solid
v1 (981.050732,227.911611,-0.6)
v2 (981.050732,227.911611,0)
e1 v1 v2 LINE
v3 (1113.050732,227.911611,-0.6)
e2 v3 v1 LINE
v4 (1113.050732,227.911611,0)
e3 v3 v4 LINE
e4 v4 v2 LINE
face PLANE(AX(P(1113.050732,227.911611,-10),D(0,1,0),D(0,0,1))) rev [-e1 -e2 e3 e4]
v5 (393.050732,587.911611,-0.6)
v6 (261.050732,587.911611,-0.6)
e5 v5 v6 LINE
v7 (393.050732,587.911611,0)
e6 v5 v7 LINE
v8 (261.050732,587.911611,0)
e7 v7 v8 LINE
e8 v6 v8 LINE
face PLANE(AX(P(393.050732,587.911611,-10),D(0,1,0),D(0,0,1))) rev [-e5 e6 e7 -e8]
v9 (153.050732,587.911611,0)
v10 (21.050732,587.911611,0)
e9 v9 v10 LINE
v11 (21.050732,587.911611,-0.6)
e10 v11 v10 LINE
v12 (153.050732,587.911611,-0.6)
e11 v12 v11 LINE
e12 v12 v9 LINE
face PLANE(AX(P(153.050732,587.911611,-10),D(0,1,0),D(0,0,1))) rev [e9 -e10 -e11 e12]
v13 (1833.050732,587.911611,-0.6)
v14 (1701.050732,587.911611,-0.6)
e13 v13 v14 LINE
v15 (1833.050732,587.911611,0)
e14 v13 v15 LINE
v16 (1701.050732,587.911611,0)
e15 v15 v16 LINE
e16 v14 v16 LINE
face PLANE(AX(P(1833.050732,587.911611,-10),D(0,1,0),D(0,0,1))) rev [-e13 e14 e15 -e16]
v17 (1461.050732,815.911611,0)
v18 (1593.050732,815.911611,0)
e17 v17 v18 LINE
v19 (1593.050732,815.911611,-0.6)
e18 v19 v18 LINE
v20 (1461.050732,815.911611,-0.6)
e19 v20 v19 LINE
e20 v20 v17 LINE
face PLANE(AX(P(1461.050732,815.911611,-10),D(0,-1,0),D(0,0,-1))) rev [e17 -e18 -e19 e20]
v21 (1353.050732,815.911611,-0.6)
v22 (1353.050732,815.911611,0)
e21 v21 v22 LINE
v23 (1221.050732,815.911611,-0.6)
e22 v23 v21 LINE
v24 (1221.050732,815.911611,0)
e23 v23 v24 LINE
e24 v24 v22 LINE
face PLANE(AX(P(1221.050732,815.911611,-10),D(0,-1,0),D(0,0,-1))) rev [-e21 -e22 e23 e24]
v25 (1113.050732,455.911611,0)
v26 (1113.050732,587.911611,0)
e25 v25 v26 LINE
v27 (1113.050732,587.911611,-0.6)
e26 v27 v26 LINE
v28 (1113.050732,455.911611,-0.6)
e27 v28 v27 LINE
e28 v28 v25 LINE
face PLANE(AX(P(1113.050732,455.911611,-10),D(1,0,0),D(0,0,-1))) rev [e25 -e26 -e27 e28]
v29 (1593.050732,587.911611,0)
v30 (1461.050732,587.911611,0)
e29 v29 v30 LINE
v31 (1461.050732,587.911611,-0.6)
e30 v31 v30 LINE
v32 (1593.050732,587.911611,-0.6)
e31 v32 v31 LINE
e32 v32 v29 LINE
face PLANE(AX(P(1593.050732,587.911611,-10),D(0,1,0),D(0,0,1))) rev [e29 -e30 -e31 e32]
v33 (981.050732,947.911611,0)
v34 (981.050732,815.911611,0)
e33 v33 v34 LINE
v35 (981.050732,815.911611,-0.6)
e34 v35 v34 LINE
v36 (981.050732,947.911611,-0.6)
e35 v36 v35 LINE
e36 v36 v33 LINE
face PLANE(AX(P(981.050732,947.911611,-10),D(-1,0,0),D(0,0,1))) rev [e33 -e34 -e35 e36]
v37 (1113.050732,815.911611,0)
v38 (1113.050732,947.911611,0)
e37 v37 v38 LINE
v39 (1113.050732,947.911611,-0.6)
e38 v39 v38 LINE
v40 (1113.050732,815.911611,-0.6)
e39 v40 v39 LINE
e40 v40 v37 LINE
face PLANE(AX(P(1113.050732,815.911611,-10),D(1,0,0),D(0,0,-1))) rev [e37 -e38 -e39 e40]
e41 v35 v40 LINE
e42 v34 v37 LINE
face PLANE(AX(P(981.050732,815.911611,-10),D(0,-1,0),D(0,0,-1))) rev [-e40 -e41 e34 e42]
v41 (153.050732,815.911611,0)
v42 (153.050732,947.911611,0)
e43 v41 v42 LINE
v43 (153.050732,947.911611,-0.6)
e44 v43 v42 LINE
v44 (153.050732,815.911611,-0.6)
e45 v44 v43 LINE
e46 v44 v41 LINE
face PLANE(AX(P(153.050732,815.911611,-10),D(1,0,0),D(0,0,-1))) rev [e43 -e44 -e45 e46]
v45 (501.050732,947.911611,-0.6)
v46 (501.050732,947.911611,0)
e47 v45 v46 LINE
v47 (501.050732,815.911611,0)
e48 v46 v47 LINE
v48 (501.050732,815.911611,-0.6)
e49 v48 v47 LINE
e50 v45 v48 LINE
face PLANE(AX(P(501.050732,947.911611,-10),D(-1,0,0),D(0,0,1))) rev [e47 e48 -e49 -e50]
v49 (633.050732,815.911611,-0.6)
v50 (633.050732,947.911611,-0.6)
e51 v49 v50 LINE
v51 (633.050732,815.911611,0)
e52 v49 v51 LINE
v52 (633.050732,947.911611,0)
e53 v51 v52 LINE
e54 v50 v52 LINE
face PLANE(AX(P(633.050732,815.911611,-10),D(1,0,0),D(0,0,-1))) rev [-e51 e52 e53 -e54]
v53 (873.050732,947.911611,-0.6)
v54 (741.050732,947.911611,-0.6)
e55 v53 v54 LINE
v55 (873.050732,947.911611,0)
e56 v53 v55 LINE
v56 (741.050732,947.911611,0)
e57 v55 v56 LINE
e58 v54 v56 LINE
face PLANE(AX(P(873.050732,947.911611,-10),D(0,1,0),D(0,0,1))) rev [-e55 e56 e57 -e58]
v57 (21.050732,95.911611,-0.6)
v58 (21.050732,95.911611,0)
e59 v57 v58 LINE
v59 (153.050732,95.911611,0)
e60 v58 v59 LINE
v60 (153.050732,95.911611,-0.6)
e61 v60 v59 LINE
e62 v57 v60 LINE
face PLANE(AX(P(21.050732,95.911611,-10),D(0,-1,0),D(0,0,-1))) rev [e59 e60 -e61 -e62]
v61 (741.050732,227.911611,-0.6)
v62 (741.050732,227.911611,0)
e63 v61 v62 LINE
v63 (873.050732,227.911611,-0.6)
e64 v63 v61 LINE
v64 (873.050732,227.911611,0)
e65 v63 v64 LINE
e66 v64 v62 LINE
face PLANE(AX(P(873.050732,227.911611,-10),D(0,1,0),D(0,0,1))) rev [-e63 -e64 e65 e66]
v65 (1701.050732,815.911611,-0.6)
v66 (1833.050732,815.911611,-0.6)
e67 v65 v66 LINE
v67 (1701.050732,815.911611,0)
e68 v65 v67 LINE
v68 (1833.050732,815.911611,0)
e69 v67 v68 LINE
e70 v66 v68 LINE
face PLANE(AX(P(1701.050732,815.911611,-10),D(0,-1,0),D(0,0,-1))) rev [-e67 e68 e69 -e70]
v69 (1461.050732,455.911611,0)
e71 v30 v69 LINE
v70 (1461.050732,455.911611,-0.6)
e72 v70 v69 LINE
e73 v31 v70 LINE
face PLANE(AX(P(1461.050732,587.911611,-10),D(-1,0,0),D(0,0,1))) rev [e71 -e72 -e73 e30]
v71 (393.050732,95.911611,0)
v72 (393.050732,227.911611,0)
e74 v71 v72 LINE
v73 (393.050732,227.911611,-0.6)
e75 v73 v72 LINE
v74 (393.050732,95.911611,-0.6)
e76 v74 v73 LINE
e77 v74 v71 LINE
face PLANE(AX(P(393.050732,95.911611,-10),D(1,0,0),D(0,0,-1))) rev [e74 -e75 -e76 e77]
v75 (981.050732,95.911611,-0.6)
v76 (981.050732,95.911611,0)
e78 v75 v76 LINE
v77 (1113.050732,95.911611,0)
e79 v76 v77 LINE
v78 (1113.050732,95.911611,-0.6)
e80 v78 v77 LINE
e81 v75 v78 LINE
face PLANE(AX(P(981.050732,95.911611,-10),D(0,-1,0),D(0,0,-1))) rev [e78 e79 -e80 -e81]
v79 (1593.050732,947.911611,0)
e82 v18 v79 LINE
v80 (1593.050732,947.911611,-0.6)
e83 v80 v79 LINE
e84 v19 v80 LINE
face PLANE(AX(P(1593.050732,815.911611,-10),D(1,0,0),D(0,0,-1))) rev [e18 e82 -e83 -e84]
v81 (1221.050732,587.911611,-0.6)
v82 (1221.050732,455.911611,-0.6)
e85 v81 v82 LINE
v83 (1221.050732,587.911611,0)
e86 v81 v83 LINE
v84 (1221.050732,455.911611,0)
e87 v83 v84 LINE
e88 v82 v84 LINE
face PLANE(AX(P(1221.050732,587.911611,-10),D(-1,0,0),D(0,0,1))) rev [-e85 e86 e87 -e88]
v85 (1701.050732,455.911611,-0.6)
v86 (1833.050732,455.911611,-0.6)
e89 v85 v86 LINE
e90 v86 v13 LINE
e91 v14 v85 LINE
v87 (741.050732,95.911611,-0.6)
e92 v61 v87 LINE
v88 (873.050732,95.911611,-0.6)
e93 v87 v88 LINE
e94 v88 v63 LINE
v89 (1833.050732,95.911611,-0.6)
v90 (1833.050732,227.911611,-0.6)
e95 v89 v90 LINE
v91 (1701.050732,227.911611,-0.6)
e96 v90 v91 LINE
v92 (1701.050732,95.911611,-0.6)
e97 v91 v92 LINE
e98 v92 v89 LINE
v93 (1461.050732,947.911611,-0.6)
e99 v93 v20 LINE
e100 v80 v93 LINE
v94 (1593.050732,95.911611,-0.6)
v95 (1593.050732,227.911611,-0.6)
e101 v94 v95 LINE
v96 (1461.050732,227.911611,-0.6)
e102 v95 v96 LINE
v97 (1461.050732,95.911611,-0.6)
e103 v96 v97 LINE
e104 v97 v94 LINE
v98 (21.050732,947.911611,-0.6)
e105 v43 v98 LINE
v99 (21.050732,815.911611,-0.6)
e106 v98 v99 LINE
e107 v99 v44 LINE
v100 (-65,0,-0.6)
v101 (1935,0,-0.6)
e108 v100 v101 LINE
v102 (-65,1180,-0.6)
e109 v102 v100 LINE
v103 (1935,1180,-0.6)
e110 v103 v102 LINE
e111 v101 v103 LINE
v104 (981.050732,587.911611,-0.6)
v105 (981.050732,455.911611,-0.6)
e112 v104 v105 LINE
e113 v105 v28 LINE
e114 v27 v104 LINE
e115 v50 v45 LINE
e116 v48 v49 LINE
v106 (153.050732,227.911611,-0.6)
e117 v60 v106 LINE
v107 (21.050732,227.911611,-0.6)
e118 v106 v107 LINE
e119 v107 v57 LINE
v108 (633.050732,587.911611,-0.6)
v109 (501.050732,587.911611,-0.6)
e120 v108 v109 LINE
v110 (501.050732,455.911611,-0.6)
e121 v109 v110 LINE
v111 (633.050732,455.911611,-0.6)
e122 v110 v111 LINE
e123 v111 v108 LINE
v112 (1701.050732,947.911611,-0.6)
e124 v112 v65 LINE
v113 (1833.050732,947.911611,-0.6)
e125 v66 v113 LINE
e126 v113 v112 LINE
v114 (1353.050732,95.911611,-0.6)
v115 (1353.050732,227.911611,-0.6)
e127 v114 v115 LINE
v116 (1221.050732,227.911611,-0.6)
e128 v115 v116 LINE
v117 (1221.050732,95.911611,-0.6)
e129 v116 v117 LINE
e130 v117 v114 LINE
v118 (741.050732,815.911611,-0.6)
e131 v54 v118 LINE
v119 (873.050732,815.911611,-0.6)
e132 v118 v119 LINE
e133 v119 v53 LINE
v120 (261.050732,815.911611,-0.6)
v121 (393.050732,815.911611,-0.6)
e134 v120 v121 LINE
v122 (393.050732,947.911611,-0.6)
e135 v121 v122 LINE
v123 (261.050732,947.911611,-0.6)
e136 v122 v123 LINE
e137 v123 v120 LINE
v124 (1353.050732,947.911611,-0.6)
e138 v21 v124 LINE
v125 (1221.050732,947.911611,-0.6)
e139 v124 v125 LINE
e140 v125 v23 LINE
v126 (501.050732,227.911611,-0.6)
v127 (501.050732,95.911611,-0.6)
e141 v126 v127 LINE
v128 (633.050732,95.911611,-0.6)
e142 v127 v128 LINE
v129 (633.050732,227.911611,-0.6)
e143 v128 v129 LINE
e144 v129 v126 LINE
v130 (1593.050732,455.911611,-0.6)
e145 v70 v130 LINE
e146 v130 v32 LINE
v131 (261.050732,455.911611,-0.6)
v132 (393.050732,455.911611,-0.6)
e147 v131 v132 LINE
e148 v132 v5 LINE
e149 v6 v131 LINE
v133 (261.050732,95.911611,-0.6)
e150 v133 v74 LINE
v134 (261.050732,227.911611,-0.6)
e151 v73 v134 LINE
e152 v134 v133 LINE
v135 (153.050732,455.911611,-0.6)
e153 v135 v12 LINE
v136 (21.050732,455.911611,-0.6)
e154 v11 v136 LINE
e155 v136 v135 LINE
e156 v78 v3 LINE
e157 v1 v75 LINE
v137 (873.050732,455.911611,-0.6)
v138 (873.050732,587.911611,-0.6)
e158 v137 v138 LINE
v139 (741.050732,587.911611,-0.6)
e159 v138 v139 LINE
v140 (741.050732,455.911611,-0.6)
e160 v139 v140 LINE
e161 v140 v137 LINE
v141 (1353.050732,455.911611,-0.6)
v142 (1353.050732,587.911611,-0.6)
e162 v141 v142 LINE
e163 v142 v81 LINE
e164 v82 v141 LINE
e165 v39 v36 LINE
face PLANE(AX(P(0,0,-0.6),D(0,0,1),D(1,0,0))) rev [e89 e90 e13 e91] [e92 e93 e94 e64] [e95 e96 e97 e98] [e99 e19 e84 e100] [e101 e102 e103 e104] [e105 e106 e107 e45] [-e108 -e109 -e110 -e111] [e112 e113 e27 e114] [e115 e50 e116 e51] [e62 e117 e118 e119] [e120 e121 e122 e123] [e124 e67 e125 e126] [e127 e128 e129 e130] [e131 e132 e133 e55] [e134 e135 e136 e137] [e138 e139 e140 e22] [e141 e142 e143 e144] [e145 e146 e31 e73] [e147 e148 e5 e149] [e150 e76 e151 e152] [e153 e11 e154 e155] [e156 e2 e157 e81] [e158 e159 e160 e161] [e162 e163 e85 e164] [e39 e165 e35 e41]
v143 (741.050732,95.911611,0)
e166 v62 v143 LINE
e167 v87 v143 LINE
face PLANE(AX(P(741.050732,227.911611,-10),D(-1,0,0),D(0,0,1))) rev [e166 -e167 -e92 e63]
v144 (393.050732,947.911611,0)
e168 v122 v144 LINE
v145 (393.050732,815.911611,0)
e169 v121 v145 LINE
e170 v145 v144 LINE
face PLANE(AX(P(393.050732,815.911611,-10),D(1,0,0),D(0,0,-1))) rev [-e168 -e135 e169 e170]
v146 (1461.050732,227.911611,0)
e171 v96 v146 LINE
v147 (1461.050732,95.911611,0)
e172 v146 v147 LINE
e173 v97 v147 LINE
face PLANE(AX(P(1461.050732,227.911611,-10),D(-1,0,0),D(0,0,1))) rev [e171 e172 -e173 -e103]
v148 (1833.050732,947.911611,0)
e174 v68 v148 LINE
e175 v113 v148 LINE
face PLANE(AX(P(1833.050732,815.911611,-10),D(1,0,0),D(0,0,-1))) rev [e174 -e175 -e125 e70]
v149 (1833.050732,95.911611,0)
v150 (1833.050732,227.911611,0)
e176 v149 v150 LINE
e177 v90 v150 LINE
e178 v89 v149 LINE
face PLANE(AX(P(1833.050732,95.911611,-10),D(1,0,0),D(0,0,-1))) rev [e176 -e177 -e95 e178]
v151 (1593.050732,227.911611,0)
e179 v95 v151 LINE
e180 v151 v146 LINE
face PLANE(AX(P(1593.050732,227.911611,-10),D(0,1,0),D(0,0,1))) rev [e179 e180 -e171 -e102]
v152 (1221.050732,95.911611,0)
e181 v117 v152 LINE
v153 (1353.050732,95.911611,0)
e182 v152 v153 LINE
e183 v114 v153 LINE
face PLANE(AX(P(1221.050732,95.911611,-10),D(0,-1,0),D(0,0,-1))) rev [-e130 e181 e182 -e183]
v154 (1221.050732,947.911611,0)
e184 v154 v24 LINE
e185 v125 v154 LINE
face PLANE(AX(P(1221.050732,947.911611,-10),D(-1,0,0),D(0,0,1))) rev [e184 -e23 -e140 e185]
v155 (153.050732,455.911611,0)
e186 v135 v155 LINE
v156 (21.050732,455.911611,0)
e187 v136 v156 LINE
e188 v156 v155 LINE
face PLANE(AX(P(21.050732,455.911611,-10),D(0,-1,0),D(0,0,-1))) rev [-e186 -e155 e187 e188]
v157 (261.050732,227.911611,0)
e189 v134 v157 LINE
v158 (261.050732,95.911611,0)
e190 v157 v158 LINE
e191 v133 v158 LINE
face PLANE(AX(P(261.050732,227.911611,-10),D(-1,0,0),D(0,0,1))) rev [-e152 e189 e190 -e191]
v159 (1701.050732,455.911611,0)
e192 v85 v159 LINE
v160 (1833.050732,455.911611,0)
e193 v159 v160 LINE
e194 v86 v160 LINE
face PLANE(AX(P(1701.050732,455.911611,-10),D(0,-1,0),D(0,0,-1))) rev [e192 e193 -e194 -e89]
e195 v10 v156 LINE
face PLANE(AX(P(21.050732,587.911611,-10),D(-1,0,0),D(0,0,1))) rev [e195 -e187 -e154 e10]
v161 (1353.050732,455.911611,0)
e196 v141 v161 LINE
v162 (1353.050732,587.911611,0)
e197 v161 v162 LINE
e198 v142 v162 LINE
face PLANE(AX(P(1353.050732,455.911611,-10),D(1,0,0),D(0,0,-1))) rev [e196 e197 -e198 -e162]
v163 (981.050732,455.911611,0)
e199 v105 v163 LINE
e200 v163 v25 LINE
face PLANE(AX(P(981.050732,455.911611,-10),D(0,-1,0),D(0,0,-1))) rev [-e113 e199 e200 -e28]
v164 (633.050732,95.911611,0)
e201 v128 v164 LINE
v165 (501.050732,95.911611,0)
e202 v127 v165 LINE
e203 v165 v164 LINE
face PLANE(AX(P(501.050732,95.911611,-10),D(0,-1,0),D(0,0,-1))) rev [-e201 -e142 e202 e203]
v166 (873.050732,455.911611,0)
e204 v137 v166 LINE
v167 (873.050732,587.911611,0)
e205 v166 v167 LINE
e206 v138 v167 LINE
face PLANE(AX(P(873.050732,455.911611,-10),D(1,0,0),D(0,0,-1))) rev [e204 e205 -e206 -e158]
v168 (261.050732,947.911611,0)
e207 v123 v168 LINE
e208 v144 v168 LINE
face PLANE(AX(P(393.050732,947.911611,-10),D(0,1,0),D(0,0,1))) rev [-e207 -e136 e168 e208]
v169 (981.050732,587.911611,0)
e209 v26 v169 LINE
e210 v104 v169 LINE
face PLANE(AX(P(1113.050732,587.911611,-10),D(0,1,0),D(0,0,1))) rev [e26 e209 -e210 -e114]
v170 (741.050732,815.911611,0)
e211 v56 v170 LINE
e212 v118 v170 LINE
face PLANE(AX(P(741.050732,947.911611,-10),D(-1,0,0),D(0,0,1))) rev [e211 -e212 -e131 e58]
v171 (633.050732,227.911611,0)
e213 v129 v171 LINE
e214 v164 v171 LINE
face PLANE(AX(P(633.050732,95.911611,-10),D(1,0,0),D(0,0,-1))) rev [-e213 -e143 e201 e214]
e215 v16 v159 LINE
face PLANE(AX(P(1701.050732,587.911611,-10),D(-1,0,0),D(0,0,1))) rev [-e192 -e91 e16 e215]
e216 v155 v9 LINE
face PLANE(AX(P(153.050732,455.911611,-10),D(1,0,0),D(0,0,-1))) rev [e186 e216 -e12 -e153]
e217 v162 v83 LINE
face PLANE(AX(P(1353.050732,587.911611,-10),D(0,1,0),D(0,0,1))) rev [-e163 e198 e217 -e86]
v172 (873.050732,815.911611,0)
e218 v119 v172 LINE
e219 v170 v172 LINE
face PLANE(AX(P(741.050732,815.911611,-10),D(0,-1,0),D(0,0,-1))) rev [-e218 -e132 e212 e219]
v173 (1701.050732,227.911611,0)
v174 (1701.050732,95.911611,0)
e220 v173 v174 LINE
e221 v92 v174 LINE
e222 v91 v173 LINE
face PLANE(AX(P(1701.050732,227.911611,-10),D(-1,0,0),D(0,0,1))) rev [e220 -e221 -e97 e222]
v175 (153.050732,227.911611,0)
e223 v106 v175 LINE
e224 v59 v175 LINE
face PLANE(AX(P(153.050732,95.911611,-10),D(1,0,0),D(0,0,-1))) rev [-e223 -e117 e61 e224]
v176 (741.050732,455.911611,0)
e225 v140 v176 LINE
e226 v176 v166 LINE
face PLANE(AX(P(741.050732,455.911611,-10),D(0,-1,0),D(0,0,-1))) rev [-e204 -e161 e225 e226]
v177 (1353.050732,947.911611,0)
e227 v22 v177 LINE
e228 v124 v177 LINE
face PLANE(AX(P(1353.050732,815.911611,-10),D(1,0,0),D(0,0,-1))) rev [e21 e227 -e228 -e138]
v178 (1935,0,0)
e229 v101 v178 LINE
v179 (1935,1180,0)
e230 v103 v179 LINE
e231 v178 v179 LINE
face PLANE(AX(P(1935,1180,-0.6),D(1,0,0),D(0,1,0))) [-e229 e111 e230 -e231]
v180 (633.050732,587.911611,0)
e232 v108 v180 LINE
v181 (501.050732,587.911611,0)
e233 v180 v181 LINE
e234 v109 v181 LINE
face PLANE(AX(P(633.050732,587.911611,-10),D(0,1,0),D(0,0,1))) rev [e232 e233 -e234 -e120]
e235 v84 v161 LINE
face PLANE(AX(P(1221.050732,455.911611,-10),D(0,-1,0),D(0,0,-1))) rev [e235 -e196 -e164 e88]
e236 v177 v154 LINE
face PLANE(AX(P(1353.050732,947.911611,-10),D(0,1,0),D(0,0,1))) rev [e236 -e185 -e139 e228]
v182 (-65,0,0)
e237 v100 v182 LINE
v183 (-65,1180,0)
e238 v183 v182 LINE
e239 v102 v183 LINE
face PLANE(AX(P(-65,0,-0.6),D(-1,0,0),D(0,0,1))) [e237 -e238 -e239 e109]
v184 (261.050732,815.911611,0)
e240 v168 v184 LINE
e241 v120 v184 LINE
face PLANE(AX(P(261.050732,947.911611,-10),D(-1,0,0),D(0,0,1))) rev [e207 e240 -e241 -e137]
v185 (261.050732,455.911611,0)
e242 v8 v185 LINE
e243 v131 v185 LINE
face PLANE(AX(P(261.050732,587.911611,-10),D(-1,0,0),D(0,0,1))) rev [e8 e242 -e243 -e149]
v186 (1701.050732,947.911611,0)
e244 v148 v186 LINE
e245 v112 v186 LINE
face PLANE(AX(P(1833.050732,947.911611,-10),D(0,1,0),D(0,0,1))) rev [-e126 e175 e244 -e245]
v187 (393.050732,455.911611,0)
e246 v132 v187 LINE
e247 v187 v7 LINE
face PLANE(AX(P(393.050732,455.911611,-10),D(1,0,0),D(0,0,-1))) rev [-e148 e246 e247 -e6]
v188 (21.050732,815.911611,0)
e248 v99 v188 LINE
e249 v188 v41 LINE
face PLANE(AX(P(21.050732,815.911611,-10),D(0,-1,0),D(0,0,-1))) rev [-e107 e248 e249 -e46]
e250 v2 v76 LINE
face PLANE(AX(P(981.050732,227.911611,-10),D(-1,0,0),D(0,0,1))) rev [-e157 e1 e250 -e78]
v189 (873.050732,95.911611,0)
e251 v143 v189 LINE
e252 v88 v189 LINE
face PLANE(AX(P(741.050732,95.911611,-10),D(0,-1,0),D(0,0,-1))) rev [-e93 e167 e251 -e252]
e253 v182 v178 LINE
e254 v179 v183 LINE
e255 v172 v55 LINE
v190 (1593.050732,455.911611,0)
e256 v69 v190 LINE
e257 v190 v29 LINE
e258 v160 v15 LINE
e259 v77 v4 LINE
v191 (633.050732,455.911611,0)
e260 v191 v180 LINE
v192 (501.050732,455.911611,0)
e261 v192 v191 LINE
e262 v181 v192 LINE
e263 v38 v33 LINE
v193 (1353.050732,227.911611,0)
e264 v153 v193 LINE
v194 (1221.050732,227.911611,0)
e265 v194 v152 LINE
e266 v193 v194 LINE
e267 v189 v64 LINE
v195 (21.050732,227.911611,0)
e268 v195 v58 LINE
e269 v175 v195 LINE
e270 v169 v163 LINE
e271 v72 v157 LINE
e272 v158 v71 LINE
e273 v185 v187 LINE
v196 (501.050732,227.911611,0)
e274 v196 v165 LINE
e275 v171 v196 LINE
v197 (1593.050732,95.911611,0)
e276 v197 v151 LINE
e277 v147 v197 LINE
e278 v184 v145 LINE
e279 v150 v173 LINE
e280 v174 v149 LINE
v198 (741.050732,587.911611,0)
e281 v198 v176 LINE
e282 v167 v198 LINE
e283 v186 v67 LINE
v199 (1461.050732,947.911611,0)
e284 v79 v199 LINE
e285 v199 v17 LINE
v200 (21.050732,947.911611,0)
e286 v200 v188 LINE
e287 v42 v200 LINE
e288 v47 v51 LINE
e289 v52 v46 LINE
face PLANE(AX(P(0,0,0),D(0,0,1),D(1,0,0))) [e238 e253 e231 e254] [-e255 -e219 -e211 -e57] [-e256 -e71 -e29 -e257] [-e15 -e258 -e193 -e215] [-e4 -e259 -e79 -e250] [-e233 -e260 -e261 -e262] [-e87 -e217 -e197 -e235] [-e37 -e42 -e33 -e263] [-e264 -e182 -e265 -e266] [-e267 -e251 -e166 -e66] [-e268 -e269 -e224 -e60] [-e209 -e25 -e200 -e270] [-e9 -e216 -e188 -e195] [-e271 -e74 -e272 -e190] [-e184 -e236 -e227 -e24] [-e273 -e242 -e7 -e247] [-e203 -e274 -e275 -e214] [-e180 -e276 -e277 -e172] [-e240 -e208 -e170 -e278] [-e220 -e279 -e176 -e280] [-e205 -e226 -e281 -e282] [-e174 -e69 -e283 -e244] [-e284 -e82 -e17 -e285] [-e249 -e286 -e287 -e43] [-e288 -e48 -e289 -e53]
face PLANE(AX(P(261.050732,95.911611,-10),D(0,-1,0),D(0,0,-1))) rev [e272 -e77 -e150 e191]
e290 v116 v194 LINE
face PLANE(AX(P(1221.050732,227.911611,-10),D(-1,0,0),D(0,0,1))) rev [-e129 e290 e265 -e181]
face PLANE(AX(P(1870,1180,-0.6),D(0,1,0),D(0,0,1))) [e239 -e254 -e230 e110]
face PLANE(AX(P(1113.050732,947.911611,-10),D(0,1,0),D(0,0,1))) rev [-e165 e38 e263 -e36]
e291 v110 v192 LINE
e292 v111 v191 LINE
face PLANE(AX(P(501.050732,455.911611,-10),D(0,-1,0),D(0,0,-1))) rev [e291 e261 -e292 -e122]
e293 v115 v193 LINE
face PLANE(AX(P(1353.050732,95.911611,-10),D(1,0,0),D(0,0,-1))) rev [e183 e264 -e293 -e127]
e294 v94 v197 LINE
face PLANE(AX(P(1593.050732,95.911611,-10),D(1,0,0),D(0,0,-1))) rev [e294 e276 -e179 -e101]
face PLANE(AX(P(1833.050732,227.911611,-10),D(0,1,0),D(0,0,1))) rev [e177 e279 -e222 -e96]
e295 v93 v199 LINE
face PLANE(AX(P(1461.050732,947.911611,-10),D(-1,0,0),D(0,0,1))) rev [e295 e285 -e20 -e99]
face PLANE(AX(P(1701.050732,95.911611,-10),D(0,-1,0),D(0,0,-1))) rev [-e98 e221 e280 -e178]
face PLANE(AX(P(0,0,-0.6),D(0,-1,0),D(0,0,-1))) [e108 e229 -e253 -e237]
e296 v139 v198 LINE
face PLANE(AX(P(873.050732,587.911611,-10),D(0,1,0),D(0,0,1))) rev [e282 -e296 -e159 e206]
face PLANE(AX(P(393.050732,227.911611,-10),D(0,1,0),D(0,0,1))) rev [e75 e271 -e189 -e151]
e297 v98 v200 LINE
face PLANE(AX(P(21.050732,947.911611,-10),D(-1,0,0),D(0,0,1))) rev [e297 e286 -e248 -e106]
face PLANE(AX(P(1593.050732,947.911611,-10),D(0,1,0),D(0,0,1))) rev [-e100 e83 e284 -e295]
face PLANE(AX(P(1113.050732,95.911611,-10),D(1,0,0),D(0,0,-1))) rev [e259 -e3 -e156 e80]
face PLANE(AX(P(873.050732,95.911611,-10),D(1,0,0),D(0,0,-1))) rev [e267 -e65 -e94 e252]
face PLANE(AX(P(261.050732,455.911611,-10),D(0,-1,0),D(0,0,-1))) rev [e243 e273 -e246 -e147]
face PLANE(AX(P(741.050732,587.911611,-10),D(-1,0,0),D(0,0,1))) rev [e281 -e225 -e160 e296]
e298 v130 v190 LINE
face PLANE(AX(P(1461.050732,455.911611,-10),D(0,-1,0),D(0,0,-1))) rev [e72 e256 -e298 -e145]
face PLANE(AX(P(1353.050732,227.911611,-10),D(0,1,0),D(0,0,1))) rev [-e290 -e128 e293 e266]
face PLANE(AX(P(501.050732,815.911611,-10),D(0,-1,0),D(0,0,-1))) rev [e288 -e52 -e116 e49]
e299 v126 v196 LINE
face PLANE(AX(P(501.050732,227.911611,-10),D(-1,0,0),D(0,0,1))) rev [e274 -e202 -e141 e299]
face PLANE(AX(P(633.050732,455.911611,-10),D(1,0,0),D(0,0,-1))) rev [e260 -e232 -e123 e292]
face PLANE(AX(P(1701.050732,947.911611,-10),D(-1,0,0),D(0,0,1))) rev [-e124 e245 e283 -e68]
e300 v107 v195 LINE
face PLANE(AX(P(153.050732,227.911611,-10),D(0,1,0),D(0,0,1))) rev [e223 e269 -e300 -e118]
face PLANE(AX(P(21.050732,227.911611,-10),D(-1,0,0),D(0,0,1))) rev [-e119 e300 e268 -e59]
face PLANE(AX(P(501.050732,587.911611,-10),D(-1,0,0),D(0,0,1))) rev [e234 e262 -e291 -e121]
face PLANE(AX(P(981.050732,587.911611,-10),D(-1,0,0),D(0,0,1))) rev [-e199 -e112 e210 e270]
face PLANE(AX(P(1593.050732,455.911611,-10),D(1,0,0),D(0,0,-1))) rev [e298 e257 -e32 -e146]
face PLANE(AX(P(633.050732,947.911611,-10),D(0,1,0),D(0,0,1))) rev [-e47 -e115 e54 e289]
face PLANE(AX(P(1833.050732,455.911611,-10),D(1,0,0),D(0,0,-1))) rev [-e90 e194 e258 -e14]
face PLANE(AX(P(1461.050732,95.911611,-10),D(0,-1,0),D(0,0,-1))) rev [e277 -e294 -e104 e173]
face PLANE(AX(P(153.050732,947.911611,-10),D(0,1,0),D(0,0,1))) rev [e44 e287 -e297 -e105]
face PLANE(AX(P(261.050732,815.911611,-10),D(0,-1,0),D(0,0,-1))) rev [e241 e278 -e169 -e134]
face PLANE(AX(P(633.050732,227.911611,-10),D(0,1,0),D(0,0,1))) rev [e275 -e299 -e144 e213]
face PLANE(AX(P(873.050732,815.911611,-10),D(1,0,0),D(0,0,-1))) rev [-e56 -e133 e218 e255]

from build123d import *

# Parameters (mm, degrees)
MODEL_W             = 1870
MODEL_H             = 1180
BASE_FLANGE1_DEPTH  = 0.6
TAB1_DEPTH          = 0.6
SKETCH7_W           = 65
SKETCH7_H           = 1180
TAB2_DEPTH          = 0.6
SKETCH9_W           = 1840.328960488
SKETCH9_H           = 1045.942358838
BOSS_EXTRUDE1_DEPTH = 0.6
SKETCH8_W           = 132
SKETCH8_H           = 132
CUT_EXTRUDE1_DEPTH  = 10


# Sheet-metal steps are written as plain solids
with BuildPart() as part:
    # Model → Base-Flange1 (new body)
    with BuildSketch(Plane.XY):
        with Locations((935, 590)):
            Rectangle(MODEL_W, MODEL_H)
        Polygon((1790, 440), (1640, 440), (1640, 595), (1650, 595), (1650, 662), (1780, 662), (1780, 595), (1790, 595), align=None, mode=Mode.SUBTRACT)
        Polygon((1595, 440), (1445, 440), (1445, 595), (1455, 595), (1455, 662), (1585, 662), (1585, 595), (1595, 595), align=None, mode=Mode.SUBTRACT)
        Polygon((1400, 440), (1250, 440), (1250, 595), (1260, 595), (1260, 662), (1390, 662), (1390, 595), (1400, 595), align=None, mode=Mode.SUBTRACT)
        Polygon((1205, 440), (1055, 440), (1055, 595), (1065, 595), (1065, 662), (1195, 662), (1195, 595), (1205, 595), align=None, mode=Mode.SUBTRACT)
        Polygon((1010, 440), (860, 440), (860, 595), (870, 595), (870, 662), (1000, 662), (1000, 595), (1010, 595), align=None, mode=Mode.SUBTRACT)
        Polygon((815, 440), (665, 440), (665, 595), (675, 595), (675, 662), (805, 662), (805, 595), (815, 595), align=None, mode=Mode.SUBTRACT)
        Polygon((620, 440), (470, 440), (470, 595), (480, 595), (480, 662), (610, 662), (610, 595), (620, 595), align=None, mode=Mode.SUBTRACT)
        Polygon((425, 440), (275, 440), (275, 595), (285, 595), (285, 662), (415, 662), (415, 595), (425, 595), align=None, mode=Mode.SUBTRACT)
        Polygon((230, 440), (80, 440), (80, 595), (90, 595), (90, 662), (220, 662), (220, 595), (230, 595), align=None, mode=Mode.SUBTRACT)
        Polygon((1790, 805), (1640, 805), (1640, 960), (1650, 960), (1650, 1027), (1780, 1027), (1780, 960), (1790, 960), align=None, mode=Mode.SUBTRACT)
        Polygon((1595, 805), (1445, 805), (1445, 960), (1455, 960), (1455, 1027), (1585, 1027), (1585, 960), (1595, 960), align=None, mode=Mode.SUBTRACT)
        Polygon((1400, 805), (1250, 805), (1250, 960), (1260, 960), (1260, 1027), (1390, 1027), (1390, 960), (1400, 960), align=None, mode=Mode.SUBTRACT)
        Polygon((1205, 805), (1055, 805), (1055, 960), (1065, 960), (1065, 1027), (1195, 1027), (1195, 960), (1205, 960), align=None, mode=Mode.SUBTRACT)
        Polygon((1010, 805), (860, 805), (860, 960), (870, 960), (870, 1027), (1000, 1027), (1000, 960), (1010, 960), align=None, mode=Mode.SUBTRACT)
        Polygon((815, 805), (665, 805), (665, 960), (675, 960), (675, 1027), (805, 1027), (805, 960), (815, 960), align=None, mode=Mode.SUBTRACT)
        Polygon((620, 805), (470, 805), (470, 960), (480, 960), (480, 1027), (610, 1027), (610, 960), (620, 960), align=None, mode=Mode.SUBTRACT)
        Polygon((425, 805), (275, 805), (275, 960), (285, 960), (285, 1027), (415, 1027), (415, 960), (425, 960), align=None, mode=Mode.SUBTRACT)
        Polygon((230, 805), (80, 805), (80, 960), (90, 960), (90, 1027), (220, 1027), (220, 960), (230, 960), align=None, mode=Mode.SUBTRACT)
        Polygon((1790, 75), (1640, 75), (1640, 230), (1650, 230), (1650, 297), (1780, 297), (1780, 230), (1790, 230), align=None, mode=Mode.SUBTRACT)
        Polygon((1595, 75), (1445, 75), (1445, 230), (1455, 230), (1455, 297), (1585, 297), (1585, 230), (1595, 230), align=None, mode=Mode.SUBTRACT)
        Polygon((1400, 75), (1250, 75), (1250, 230), (1260, 230), (1260, 297), (1390, 297), (1390, 230), (1400, 230), align=None, mode=Mode.SUBTRACT)
        Polygon((1205, 75), (1055, 75), (1055, 230), (1065, 230), (1065, 297), (1195, 297), (1195, 230), (1205, 230), align=None, mode=Mode.SUBTRACT)
        Polygon((1010, 75), (860, 75), (860, 230), (870, 230), (870, 297), (1000, 297), (1000, 230), (1010, 230), align=None, mode=Mode.SUBTRACT)
        Polygon((815, 75), (665, 75), (665, 230), (675, 230), (675, 297), (805, 297), (805, 230), (815, 230), align=None, mode=Mode.SUBTRACT)
        Polygon((620, 75), (470, 75), (470, 230), (480, 230), (480, 297), (610, 297), (610, 230), (620, 230), align=None, mode=Mode.SUBTRACT)
        Polygon((425, 75), (275, 75), (275, 230), (285, 230), (285, 297), (415, 297), (415, 230), (425, 230), align=None, mode=Mode.SUBTRACT)
        Polygon((230, 75), (80, 75), (80, 230), (90, 230), (90, 297), (220, 297), (220, 230), (230, 230), align=None, mode=Mode.SUBTRACT)
    extrude(amount=-BASE_FLANGE1_DEPTH)

    # Sketch6 → Tab1 (add)
    with BuildSketch(Plane.XY):
        Polygon((1705, 805), (1725, 805), (1725, 806), (1789, 806), (1789, 959), (1779, 959), (1779, 1026), (1725, 1026), (1725, 1027), (1705, 1027), (1705, 1026), (1651, 1026), (1651, 959), (1641, 959), (1641, 806), (1705, 806), align=None)
        Polygon((1705, 440), (1725, 440), (1725, 441), (1789, 441), (1789, 594), (1779, 594), (1779, 661), (1725, 661), (1725, 662), (1705, 662), (1705, 661), (1651, 661), (1651, 594), (1641, 594), (1641, 441), (1705, 441), align=None)
        Polygon((1705, 75), (1725, 75), (1725, 76), (1789, 76), (1789, 229), (1779, 229), (1779, 296), (1725, 296), (1725, 297), (1705, 297), (1705, 296), (1651, 296), (1651, 229), (1641, 229), (1641, 76), (1705, 76), align=None)
    extrude(amount=-TAB1_DEPTH)

    # Sketch7 → Tab2 (add)
    with BuildSketch(Plane.XY):
        with Locations((1902.5, 590)):
            Rectangle(SKETCH7_W, SKETCH7_H)
        with Locations((-32.5, 590)):
            Rectangle(SKETCH7_W, SKETCH7_H)
    extrude(amount=-TAB2_DEPTH)

    # Sketch9 → Boss-Extrude1 (add)
    with BuildSketch(Plane.XY):
        with Locations((950.64470062, 555.573524784)):
            Rectangle(SKETCH9_W, SKETCH9_H)
    extrude(amount=-BOSS_EXTRUDE1_DEPTH)

    # Sketch8 → Cut-Extrude1 (cut)
    with BuildSketch(Plane.XY):
        with Locations((1767.05073242, 881.911611336)):
            Rectangle(SKETCH8_W, SKETCH8_H)
        with Locations((1527.05073242, 881.911611336)):
            Rectangle(SKETCH8_W, SKETCH8_H)
        with Locations((1287.05073242, 881.911611336)):
            Rectangle(SKETCH8_W, SKETCH8_H)
        with Locations((1047.05073242, 881.911611336)):
            Rectangle(SKETCH8_W, SKETCH8_H)
        with Locations((807.05073242, 881.911611336)):
            Rectangle(SKETCH8_W, SKETCH8_H)
        with Locations((567.05073242, 881.911611336)):
            Rectangle(SKETCH8_W, SKETCH8_H)
        with Locations((327.05073242, 881.911611336)):
            Rectangle(SKETCH8_W, SKETCH8_H)
        with Locations((87.05073242, 881.911611336)):
            Rectangle(SKETCH8_W, SKETCH8_H)
        with Locations((1527.05073242, 521.911611336)):
            Rectangle(SKETCH8_W, SKETCH8_H)
        with Locations((1287.05073242, 521.911611336)):
            Rectangle(SKETCH8_W, SKETCH8_H)
        with Locations((1047.05073242, 521.911611336)):
            Rectangle(SKETCH8_W, SKETCH8_H)
        with Locations((807.05073242, 521.911611336)):
            Rectangle(SKETCH8_W, SKETCH8_H)
        with Locations((567.05073242, 521.911611336)):
            Rectangle(SKETCH8_W, SKETCH8_H)
        with Locations((327.05073242, 521.911611336)):
            Rectangle(SKETCH8_W, SKETCH8_H)
        with Locations((87.05073242, 521.911611336)):
            Rectangle(SKETCH8_W, SKETCH8_H)
        with Locations((1527.05073242, 161.911611336)):
            Rectangle(SKETCH8_W, SKETCH8_H)
        with Locations((1287.05073242, 161.911611336)):
            Rectangle(SKETCH8_W, SKETCH8_H)
        with Locations((1047.05073242, 161.911611336)):
            Rectangle(SKETCH8_W, SKETCH8_H)
        with Locations((807.05073242, 161.911611336)):
            Rectangle(SKETCH8_W, SKETCH8_H)
        with Locations((567.05073242, 161.911611336)):
            Rectangle(SKETCH8_W, SKETCH8_H)
        with Locations((327.05073242, 161.911611336)):
            Rectangle(SKETCH8_W, SKETCH8_H)
        with Locations((87.05073242, 161.911611336)):
            Rectangle(SKETCH8_W, SKETCH8_H)
        with Locations((1767.05073242, 521.911611336)):
            Rectangle(SKETCH8_W, SKETCH8_H)
        with Locations((1767.05073242, 161.911611336)):
            Rectangle(SKETCH8_W, SKETCH8_H)
    extrude(amount=-CUT_EXTRUDE1_DEPTH, mode=Mode.SUBTRACT)


solid = part.part
